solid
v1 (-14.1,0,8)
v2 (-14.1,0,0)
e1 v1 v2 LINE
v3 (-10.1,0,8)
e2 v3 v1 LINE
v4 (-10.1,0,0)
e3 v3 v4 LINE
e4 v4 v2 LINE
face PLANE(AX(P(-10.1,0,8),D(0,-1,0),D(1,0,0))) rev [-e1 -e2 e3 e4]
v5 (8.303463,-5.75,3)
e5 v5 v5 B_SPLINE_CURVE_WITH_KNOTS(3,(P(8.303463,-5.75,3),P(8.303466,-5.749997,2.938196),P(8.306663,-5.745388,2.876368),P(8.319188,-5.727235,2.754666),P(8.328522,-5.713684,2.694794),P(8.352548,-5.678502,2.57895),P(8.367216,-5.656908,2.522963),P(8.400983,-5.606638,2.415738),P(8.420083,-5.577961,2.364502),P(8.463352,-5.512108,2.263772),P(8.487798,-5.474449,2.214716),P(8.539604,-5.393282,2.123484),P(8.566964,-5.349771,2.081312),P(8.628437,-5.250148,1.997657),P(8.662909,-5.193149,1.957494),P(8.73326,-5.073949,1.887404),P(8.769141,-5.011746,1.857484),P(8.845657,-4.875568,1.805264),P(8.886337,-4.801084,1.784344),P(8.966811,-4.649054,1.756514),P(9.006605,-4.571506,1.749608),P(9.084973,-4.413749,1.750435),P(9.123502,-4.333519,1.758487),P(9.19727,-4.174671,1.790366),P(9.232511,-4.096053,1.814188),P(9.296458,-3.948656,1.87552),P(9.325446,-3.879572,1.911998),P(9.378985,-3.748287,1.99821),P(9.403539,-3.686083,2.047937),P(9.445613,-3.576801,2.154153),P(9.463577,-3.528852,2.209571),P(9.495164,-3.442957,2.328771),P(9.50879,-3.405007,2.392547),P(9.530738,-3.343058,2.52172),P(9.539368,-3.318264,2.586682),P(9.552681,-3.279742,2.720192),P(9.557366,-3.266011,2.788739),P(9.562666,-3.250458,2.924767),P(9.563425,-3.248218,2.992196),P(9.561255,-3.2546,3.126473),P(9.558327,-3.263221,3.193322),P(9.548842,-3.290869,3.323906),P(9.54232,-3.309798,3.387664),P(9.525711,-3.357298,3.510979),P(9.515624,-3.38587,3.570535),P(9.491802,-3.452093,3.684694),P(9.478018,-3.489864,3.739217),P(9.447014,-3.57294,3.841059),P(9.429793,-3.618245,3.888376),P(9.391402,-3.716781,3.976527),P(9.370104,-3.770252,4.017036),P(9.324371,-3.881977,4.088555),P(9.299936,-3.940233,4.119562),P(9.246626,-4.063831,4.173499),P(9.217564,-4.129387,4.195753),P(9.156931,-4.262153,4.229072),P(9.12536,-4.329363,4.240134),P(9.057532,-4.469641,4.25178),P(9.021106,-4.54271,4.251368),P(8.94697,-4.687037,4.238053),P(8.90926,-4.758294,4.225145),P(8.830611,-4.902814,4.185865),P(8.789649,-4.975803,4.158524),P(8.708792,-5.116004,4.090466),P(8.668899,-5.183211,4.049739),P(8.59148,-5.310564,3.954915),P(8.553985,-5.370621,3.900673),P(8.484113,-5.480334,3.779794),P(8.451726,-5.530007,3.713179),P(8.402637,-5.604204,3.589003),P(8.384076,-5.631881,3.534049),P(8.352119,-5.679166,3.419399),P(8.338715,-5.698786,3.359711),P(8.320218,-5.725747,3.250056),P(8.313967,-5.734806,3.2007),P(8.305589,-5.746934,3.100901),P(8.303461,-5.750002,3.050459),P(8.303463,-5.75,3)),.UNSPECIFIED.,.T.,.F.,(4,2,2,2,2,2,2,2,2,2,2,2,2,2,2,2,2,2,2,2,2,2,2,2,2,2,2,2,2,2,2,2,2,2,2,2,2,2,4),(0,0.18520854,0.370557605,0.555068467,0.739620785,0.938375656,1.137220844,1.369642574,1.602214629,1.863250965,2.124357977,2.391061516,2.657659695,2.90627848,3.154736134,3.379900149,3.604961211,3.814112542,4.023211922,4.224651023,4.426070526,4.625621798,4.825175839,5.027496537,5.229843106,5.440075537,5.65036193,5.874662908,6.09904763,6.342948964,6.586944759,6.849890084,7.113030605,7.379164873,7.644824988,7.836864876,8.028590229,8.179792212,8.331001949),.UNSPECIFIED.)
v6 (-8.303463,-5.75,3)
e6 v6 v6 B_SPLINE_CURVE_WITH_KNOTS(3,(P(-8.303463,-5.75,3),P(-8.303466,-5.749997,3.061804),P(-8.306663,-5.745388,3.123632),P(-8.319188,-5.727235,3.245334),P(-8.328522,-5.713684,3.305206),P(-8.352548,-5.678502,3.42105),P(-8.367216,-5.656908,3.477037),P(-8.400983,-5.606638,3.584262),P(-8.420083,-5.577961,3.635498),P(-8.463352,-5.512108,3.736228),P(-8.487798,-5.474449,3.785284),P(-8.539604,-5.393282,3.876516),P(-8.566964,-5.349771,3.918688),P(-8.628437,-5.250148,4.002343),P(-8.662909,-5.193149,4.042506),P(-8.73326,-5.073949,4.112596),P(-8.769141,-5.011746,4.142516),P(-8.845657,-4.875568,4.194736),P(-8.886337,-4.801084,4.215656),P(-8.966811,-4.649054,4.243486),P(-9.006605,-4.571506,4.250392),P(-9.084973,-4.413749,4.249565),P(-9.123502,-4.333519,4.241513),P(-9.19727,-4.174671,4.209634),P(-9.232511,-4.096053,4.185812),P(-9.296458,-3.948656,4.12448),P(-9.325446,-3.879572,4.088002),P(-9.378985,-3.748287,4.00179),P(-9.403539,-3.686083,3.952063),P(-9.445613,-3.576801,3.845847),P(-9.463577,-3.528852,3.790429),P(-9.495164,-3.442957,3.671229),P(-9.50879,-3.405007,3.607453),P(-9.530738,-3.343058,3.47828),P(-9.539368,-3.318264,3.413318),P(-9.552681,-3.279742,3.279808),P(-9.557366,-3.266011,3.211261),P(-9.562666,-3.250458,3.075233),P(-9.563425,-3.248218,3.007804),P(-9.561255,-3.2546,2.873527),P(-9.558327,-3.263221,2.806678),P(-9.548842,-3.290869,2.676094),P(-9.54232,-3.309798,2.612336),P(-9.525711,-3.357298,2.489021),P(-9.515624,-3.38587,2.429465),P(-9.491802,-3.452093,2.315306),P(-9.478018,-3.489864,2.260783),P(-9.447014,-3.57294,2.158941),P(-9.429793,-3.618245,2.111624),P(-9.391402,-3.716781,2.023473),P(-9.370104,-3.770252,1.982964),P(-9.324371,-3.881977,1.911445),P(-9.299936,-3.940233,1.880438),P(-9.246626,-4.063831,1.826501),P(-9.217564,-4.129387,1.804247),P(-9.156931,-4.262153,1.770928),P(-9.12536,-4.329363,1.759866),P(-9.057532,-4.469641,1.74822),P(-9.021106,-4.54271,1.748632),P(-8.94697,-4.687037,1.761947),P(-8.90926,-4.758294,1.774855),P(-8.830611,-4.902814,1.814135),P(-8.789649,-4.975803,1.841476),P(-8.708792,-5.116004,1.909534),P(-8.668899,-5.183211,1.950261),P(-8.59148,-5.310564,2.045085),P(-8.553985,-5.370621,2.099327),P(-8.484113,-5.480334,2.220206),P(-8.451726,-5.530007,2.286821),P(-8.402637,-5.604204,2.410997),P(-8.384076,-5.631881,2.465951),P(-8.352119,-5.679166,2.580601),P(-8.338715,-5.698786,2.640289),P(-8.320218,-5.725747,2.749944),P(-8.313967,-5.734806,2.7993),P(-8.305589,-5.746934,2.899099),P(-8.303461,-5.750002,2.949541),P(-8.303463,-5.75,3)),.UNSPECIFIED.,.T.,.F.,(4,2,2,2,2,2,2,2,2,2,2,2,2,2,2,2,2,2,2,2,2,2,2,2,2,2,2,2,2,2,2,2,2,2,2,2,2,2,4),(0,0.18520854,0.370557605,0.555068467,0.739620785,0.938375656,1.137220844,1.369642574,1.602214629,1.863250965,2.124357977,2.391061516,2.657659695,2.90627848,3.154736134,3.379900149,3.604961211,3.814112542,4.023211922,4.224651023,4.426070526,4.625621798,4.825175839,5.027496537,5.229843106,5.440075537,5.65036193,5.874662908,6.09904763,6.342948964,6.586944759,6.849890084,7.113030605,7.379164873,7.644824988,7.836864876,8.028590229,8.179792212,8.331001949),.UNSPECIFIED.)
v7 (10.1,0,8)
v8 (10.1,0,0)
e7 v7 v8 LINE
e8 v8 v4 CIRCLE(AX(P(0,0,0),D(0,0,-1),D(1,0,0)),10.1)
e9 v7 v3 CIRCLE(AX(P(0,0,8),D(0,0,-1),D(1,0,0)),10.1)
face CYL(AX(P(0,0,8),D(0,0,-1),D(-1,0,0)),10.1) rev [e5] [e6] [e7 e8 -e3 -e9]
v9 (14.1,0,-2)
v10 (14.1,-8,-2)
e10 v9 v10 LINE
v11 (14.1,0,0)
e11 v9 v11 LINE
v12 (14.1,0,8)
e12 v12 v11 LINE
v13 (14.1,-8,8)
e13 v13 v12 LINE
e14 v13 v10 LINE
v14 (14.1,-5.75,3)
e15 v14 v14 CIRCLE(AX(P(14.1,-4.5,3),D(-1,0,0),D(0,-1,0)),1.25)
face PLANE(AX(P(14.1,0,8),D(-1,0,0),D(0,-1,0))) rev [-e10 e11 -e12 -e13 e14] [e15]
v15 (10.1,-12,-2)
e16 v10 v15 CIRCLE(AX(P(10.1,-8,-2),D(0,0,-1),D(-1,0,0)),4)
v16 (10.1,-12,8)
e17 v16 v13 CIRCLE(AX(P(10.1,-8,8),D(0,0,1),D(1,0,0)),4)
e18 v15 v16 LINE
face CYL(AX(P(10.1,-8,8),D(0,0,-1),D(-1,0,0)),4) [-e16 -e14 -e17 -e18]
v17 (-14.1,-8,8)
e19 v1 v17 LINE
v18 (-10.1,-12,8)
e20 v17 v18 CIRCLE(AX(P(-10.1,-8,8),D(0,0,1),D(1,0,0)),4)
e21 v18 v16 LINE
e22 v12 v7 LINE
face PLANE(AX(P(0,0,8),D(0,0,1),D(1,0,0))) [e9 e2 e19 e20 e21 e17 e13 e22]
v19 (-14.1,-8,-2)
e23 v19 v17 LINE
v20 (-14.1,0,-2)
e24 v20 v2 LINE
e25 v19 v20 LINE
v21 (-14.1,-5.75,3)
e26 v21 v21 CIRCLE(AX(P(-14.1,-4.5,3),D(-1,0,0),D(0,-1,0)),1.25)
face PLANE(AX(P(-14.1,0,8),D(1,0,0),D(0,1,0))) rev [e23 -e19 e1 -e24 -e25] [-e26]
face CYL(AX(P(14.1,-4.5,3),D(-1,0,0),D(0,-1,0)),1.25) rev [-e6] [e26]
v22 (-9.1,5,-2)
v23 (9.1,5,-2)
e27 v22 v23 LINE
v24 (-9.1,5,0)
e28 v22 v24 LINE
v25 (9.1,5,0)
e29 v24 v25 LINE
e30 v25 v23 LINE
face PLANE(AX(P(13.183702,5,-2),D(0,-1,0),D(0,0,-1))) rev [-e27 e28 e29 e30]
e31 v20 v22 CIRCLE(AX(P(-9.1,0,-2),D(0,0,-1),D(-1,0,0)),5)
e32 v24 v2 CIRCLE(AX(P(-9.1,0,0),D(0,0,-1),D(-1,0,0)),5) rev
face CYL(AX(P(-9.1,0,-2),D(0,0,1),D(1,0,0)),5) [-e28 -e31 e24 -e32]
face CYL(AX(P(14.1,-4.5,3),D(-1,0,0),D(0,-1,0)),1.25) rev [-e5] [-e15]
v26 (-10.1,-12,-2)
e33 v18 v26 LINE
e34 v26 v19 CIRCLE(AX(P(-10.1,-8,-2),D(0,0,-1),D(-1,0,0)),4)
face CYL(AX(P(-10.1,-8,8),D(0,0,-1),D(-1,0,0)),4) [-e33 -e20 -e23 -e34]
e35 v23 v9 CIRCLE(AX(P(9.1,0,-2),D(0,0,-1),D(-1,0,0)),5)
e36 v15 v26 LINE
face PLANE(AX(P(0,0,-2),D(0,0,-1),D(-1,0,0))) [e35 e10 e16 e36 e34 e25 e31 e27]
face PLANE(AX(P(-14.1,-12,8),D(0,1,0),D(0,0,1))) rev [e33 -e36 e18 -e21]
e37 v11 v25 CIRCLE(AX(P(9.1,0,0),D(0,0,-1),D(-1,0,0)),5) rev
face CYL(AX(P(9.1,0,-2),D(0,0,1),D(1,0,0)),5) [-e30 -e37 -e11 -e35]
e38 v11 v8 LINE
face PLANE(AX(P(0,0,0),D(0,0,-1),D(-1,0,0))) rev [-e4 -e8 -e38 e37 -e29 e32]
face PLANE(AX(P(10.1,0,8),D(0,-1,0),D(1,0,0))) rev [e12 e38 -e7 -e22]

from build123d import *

# Parameters (mm, degrees)
EXTRUDE_1_DEPTH     = 8
EXTRUDE_2_DEPTH     = 2
SKETCH_3_R          = 1.25
CUT_EXTRUDE_1_DEPTH = 32.673964071
FILLET_1_R          = 5
FILLET_2_R          = 4


with BuildPart() as part:
    # 草图1 → 凸台-拉伸1 (new body)
    with BuildSketch(Plane.XY):
        with BuildLine():
            Line((-10.1, 0), (-14.1, 0))
            Line((-14.1, 0), (-14.1, -12))
            Line((-14.1, -12), (14.1, -12))
            Line((14.1, -12), (14.1, 0))
            Line((14.1, 0), (10.1, 0))
            ThreePointArc((10.1, 0), (0, -10.1), (-10.1, 0))
        make_face()
    extrude(amount=EXTRUDE_1_DEPTH)

    # 草图2 → 凸台-拉伸2 (add)
    with BuildSketch(Plane(origin=(0, 0, 0), x_dir=(-1, 0, 0), z_dir=(0, 0, -1))):
        with BuildLine():
            Line((-14.1, -12), (-14.1, 0))
            ThreePointArc((-14.1, 0), (-13.869033835, 2.541633427), (-13.18370206, 5))
            Line((-13.18370206, 5), (13.18370206, 5))
            ThreePointArc((13.18370206, 5), (13.869033835, 2.541633427), (14.1, 0))
            Line((14.1, 0), (14.1, -12))
            Line((14.1, -12), (-14.1, -12))
        make_face()
    extrude(amount=EXTRUDE_2_DEPTH)

    # 草图3 → 切除-拉伸1 (cut, through all)
    with BuildSketch(Plane.ZY.offset(14.1)):
        with Locations(Location((3, -4.5, 0), (0, 0, 270))):
            Circle(SKETCH_3_R)
    extrude(amount=-CUT_EXTRUDE_1_DEPTH, mode=Mode.SUBTRACT)

    # 圆角1
    fillet_1_edges = [part.edges().sort_by_distance(p)[0] for p in [
        (-13.18370206, 5, -1),
        (13.18370206, 5, -1),
    ]]
    fillet(fillet_1_edges, radius=FILLET_1_R - 0.0001)  # a hair under: the kernel refuses the full size

    # 圆角2
    fillet_2_edges = [part.edges().sort_by_distance(p)[0] for p in [
        (14.1, -12, 3),
        (-14.1, -12, 3),
    ]]
    fillet(fillet_2_edges, radius=FILLET_2_R)


solid = part.part
